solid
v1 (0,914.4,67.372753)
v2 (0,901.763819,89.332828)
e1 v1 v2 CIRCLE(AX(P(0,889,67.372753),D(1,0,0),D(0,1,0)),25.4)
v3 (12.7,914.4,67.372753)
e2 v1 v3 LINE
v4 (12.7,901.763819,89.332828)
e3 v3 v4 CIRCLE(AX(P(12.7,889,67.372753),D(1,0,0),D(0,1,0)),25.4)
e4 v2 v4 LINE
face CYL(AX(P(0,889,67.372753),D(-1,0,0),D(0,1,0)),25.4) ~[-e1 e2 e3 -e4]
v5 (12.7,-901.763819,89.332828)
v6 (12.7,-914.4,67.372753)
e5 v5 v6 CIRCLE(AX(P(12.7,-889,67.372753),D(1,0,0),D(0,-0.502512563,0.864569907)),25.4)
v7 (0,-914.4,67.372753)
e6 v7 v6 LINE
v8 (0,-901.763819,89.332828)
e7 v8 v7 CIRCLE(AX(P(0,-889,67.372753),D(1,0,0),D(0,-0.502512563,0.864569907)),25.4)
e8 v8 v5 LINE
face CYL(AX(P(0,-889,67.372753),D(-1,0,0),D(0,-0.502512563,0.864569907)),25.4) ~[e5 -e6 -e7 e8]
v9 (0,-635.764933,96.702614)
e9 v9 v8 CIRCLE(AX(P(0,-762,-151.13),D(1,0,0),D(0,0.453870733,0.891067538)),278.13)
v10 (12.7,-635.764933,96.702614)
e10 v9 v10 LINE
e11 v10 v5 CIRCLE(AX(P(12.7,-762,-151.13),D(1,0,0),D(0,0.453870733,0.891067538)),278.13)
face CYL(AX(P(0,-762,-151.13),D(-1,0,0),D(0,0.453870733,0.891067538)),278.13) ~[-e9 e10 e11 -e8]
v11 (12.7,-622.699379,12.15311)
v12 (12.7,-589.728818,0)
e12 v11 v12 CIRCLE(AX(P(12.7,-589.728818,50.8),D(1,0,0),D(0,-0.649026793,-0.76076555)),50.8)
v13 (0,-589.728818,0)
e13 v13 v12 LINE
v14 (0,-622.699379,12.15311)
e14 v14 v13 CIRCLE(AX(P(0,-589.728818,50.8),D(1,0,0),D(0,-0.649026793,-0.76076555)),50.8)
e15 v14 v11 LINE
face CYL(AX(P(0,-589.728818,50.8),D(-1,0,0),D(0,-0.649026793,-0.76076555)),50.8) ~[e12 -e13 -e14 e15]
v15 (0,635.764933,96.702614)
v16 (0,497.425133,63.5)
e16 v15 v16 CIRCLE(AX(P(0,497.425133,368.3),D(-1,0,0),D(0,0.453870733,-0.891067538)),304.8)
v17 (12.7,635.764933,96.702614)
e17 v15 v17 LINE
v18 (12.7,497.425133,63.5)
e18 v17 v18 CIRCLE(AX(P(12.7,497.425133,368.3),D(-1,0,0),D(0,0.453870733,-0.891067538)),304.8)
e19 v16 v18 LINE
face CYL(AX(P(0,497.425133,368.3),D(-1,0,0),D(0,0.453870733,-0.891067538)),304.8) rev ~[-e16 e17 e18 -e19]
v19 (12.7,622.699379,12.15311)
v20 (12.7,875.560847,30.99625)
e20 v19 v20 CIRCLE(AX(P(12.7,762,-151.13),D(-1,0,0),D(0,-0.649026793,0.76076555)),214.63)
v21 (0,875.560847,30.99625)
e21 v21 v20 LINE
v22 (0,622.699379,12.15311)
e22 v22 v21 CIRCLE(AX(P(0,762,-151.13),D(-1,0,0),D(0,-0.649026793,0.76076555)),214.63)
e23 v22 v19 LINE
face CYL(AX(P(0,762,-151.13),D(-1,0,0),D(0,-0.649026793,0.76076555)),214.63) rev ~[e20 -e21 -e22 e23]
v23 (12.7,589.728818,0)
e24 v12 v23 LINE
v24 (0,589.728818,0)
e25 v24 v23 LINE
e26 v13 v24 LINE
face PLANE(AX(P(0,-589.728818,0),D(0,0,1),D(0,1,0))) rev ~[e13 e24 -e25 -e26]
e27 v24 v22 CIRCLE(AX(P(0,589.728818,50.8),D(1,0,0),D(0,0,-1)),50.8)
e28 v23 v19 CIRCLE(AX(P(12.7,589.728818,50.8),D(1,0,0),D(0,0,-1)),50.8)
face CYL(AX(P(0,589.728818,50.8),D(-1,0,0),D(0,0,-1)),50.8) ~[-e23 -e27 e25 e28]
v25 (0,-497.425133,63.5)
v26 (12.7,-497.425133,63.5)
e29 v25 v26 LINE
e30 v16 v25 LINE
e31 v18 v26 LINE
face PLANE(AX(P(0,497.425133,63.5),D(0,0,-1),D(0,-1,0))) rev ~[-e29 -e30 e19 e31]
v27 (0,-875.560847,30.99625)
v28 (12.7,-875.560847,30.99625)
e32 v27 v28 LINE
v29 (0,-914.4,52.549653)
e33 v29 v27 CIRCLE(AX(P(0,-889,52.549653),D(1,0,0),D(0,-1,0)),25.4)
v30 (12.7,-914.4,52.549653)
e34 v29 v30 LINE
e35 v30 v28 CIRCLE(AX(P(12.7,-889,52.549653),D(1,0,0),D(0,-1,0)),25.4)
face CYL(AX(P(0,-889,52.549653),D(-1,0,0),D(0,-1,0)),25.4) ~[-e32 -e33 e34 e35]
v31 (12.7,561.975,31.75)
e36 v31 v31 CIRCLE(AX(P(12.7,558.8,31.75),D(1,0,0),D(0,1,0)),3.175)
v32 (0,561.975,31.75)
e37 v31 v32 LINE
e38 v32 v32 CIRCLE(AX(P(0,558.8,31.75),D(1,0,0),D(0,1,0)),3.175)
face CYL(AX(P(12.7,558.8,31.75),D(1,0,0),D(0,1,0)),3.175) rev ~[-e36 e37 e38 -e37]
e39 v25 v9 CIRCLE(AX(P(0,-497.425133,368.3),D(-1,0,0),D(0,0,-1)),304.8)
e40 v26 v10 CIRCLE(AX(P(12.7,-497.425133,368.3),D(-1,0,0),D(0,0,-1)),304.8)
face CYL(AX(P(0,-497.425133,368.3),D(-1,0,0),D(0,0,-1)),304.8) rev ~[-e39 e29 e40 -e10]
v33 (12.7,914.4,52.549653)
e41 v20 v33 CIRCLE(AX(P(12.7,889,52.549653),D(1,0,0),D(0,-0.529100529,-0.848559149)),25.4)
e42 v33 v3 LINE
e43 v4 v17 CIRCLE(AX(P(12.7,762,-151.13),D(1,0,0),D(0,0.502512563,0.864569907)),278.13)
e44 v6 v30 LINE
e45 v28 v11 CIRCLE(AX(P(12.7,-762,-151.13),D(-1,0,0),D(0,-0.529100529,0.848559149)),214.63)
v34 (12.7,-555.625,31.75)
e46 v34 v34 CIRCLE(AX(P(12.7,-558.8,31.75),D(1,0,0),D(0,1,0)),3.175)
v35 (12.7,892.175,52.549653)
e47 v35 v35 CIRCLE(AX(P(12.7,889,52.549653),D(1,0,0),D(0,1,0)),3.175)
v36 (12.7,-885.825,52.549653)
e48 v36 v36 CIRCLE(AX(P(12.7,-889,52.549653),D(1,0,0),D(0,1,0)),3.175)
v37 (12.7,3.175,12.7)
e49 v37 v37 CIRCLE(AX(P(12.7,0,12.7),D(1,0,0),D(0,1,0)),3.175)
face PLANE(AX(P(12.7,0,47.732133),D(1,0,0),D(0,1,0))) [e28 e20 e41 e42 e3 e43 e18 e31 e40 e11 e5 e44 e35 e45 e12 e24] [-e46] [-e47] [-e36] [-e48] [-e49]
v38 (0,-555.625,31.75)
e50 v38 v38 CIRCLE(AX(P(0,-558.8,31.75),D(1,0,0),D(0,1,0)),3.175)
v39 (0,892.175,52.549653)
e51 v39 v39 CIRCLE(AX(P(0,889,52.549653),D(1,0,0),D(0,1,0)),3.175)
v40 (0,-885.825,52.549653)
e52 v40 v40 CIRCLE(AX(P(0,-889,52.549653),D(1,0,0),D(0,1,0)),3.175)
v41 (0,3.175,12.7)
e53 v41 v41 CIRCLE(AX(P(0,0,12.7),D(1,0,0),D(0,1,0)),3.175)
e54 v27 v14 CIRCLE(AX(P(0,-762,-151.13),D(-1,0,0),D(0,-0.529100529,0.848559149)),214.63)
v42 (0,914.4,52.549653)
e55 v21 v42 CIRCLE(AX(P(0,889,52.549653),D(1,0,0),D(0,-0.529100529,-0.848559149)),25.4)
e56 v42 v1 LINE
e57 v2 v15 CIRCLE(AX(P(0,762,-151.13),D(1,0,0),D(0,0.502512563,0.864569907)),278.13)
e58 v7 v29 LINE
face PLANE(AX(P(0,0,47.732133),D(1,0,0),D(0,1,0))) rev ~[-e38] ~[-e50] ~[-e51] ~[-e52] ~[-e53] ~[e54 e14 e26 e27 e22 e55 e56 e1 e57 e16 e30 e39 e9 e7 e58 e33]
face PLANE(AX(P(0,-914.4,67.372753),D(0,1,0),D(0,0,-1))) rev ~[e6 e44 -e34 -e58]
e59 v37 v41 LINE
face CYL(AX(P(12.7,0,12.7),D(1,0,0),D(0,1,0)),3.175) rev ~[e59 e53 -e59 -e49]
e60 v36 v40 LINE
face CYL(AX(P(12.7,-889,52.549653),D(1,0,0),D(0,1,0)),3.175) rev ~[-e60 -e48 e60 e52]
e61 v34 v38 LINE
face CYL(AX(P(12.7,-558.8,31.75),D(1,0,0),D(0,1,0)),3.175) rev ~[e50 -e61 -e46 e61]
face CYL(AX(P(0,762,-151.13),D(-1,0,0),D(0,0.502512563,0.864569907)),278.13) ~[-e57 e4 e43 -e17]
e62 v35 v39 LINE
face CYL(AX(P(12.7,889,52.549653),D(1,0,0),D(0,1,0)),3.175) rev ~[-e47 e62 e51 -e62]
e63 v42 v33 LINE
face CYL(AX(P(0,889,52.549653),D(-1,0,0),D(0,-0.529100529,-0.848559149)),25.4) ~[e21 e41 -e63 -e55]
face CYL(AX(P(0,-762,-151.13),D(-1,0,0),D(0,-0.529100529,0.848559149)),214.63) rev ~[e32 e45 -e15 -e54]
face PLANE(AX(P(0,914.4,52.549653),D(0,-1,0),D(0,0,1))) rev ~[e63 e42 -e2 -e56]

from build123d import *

# Parameters (mm, degrees)
F1_DEPTH      = 12.7
F2_R          = 3.175
F3_DEPTH      = 25.4
F3_DEPTH_BACK = 1882


# Not quite as in the source:
# - an extrude ends at something that could not be found from the text; its depth is read off the source's solid


with BuildPart() as f1:
    # F0 (on Right) → F1 (new body)
    with BuildSketch(Plane.YZ):
        with BuildLine():
            ThreePointArc((-622.6993794949, 12.1531100478), (-607.2983658108, 3.1350127999), (-589.7288184286, 0))
            Line((-589.7288184286, 0), (589.7288184286, 0))
            ThreePointArc((589.7288184286, 0), (607.2983658108, 3.1350127999), (622.6993794949, 12.1531100478))
            ThreePointArc((622.6993794949, 12.1531100478), (746.0500791914, 62.9065317561), (875.5608465608, 30.9962502452))
            ThreePointArc((875.5608465608, 30.9962502452), (901.3248834202, 30.3402571366), (914.4, 52.5496526411))
            Line((914.4, 52.5496526411), (914.4, 67.3727526142))
            ThreePointArc((914.4, 67.3727526142), (911.0154605337, 80.0408028781), (901.7638190955, 89.3328282539))
            ThreePointArc((901.7638190955, 89.3328282539), (769.7029358002, 126.8933113968), (635.7649329622, 96.7026143791))
            ThreePointArc((635.7649329622, 96.7026143791), (568.5593617374, 71.9168669296), (497.4251334688, 63.5))
            Line((497.4251334688, 63.5), (-497.4251334688, 63.5))
            ThreePointArc((-497.4251334688, 63.5), (-568.5593617374, 71.9168669296), (-635.7649329622, 96.7026143791))
            ThreePointArc((-635.7649329622, 96.7026143791), (-769.7029358002, 126.8933113968), (-901.7638190955, 89.3328282539))
            ThreePointArc((-901.7638190955, 89.3328282539), (-911.0154605337, 80.0408028781), (-914.4, 67.3727526142))
            Line((-914.4, 67.3727526142), (-914.4, 52.5496526411))
            ThreePointArc((-914.4, 52.5496526411), (-901.3248834202, 30.3402571366), (-875.5608465608, 30.9962502452))
            ThreePointArc((-875.5608465608, 30.9962502452), (-746.0500791914, 62.9065317561), (-622.6993794949, 12.1531100478))
        make_face()
    extrude(amount=F1_DEPTH)

    # F2 (on face) → F3 (cut, two sides)
    with BuildSketch(Plane.YZ.offset(12.7)) as f3_sk:
        with Locations((-889, 52.5496526411)):
            Circle(F2_R)
        with Locations((-558.8, 31.75)):
            Circle(F2_R)
        with Locations((0, 12.7)):
            Circle(F2_R)
        with Locations((558.8, 31.75)):
            Circle(F2_R)
        with Locations((889, 52.5496526411)):
            Circle(F2_R)
    extrude(amount=-F3_DEPTH, mode=Mode.SUBTRACT)
    extrude(f3_sk.sketch, amount=F3_DEPTH_BACK, mode=Mode.SUBTRACT)


solid = f1.part
